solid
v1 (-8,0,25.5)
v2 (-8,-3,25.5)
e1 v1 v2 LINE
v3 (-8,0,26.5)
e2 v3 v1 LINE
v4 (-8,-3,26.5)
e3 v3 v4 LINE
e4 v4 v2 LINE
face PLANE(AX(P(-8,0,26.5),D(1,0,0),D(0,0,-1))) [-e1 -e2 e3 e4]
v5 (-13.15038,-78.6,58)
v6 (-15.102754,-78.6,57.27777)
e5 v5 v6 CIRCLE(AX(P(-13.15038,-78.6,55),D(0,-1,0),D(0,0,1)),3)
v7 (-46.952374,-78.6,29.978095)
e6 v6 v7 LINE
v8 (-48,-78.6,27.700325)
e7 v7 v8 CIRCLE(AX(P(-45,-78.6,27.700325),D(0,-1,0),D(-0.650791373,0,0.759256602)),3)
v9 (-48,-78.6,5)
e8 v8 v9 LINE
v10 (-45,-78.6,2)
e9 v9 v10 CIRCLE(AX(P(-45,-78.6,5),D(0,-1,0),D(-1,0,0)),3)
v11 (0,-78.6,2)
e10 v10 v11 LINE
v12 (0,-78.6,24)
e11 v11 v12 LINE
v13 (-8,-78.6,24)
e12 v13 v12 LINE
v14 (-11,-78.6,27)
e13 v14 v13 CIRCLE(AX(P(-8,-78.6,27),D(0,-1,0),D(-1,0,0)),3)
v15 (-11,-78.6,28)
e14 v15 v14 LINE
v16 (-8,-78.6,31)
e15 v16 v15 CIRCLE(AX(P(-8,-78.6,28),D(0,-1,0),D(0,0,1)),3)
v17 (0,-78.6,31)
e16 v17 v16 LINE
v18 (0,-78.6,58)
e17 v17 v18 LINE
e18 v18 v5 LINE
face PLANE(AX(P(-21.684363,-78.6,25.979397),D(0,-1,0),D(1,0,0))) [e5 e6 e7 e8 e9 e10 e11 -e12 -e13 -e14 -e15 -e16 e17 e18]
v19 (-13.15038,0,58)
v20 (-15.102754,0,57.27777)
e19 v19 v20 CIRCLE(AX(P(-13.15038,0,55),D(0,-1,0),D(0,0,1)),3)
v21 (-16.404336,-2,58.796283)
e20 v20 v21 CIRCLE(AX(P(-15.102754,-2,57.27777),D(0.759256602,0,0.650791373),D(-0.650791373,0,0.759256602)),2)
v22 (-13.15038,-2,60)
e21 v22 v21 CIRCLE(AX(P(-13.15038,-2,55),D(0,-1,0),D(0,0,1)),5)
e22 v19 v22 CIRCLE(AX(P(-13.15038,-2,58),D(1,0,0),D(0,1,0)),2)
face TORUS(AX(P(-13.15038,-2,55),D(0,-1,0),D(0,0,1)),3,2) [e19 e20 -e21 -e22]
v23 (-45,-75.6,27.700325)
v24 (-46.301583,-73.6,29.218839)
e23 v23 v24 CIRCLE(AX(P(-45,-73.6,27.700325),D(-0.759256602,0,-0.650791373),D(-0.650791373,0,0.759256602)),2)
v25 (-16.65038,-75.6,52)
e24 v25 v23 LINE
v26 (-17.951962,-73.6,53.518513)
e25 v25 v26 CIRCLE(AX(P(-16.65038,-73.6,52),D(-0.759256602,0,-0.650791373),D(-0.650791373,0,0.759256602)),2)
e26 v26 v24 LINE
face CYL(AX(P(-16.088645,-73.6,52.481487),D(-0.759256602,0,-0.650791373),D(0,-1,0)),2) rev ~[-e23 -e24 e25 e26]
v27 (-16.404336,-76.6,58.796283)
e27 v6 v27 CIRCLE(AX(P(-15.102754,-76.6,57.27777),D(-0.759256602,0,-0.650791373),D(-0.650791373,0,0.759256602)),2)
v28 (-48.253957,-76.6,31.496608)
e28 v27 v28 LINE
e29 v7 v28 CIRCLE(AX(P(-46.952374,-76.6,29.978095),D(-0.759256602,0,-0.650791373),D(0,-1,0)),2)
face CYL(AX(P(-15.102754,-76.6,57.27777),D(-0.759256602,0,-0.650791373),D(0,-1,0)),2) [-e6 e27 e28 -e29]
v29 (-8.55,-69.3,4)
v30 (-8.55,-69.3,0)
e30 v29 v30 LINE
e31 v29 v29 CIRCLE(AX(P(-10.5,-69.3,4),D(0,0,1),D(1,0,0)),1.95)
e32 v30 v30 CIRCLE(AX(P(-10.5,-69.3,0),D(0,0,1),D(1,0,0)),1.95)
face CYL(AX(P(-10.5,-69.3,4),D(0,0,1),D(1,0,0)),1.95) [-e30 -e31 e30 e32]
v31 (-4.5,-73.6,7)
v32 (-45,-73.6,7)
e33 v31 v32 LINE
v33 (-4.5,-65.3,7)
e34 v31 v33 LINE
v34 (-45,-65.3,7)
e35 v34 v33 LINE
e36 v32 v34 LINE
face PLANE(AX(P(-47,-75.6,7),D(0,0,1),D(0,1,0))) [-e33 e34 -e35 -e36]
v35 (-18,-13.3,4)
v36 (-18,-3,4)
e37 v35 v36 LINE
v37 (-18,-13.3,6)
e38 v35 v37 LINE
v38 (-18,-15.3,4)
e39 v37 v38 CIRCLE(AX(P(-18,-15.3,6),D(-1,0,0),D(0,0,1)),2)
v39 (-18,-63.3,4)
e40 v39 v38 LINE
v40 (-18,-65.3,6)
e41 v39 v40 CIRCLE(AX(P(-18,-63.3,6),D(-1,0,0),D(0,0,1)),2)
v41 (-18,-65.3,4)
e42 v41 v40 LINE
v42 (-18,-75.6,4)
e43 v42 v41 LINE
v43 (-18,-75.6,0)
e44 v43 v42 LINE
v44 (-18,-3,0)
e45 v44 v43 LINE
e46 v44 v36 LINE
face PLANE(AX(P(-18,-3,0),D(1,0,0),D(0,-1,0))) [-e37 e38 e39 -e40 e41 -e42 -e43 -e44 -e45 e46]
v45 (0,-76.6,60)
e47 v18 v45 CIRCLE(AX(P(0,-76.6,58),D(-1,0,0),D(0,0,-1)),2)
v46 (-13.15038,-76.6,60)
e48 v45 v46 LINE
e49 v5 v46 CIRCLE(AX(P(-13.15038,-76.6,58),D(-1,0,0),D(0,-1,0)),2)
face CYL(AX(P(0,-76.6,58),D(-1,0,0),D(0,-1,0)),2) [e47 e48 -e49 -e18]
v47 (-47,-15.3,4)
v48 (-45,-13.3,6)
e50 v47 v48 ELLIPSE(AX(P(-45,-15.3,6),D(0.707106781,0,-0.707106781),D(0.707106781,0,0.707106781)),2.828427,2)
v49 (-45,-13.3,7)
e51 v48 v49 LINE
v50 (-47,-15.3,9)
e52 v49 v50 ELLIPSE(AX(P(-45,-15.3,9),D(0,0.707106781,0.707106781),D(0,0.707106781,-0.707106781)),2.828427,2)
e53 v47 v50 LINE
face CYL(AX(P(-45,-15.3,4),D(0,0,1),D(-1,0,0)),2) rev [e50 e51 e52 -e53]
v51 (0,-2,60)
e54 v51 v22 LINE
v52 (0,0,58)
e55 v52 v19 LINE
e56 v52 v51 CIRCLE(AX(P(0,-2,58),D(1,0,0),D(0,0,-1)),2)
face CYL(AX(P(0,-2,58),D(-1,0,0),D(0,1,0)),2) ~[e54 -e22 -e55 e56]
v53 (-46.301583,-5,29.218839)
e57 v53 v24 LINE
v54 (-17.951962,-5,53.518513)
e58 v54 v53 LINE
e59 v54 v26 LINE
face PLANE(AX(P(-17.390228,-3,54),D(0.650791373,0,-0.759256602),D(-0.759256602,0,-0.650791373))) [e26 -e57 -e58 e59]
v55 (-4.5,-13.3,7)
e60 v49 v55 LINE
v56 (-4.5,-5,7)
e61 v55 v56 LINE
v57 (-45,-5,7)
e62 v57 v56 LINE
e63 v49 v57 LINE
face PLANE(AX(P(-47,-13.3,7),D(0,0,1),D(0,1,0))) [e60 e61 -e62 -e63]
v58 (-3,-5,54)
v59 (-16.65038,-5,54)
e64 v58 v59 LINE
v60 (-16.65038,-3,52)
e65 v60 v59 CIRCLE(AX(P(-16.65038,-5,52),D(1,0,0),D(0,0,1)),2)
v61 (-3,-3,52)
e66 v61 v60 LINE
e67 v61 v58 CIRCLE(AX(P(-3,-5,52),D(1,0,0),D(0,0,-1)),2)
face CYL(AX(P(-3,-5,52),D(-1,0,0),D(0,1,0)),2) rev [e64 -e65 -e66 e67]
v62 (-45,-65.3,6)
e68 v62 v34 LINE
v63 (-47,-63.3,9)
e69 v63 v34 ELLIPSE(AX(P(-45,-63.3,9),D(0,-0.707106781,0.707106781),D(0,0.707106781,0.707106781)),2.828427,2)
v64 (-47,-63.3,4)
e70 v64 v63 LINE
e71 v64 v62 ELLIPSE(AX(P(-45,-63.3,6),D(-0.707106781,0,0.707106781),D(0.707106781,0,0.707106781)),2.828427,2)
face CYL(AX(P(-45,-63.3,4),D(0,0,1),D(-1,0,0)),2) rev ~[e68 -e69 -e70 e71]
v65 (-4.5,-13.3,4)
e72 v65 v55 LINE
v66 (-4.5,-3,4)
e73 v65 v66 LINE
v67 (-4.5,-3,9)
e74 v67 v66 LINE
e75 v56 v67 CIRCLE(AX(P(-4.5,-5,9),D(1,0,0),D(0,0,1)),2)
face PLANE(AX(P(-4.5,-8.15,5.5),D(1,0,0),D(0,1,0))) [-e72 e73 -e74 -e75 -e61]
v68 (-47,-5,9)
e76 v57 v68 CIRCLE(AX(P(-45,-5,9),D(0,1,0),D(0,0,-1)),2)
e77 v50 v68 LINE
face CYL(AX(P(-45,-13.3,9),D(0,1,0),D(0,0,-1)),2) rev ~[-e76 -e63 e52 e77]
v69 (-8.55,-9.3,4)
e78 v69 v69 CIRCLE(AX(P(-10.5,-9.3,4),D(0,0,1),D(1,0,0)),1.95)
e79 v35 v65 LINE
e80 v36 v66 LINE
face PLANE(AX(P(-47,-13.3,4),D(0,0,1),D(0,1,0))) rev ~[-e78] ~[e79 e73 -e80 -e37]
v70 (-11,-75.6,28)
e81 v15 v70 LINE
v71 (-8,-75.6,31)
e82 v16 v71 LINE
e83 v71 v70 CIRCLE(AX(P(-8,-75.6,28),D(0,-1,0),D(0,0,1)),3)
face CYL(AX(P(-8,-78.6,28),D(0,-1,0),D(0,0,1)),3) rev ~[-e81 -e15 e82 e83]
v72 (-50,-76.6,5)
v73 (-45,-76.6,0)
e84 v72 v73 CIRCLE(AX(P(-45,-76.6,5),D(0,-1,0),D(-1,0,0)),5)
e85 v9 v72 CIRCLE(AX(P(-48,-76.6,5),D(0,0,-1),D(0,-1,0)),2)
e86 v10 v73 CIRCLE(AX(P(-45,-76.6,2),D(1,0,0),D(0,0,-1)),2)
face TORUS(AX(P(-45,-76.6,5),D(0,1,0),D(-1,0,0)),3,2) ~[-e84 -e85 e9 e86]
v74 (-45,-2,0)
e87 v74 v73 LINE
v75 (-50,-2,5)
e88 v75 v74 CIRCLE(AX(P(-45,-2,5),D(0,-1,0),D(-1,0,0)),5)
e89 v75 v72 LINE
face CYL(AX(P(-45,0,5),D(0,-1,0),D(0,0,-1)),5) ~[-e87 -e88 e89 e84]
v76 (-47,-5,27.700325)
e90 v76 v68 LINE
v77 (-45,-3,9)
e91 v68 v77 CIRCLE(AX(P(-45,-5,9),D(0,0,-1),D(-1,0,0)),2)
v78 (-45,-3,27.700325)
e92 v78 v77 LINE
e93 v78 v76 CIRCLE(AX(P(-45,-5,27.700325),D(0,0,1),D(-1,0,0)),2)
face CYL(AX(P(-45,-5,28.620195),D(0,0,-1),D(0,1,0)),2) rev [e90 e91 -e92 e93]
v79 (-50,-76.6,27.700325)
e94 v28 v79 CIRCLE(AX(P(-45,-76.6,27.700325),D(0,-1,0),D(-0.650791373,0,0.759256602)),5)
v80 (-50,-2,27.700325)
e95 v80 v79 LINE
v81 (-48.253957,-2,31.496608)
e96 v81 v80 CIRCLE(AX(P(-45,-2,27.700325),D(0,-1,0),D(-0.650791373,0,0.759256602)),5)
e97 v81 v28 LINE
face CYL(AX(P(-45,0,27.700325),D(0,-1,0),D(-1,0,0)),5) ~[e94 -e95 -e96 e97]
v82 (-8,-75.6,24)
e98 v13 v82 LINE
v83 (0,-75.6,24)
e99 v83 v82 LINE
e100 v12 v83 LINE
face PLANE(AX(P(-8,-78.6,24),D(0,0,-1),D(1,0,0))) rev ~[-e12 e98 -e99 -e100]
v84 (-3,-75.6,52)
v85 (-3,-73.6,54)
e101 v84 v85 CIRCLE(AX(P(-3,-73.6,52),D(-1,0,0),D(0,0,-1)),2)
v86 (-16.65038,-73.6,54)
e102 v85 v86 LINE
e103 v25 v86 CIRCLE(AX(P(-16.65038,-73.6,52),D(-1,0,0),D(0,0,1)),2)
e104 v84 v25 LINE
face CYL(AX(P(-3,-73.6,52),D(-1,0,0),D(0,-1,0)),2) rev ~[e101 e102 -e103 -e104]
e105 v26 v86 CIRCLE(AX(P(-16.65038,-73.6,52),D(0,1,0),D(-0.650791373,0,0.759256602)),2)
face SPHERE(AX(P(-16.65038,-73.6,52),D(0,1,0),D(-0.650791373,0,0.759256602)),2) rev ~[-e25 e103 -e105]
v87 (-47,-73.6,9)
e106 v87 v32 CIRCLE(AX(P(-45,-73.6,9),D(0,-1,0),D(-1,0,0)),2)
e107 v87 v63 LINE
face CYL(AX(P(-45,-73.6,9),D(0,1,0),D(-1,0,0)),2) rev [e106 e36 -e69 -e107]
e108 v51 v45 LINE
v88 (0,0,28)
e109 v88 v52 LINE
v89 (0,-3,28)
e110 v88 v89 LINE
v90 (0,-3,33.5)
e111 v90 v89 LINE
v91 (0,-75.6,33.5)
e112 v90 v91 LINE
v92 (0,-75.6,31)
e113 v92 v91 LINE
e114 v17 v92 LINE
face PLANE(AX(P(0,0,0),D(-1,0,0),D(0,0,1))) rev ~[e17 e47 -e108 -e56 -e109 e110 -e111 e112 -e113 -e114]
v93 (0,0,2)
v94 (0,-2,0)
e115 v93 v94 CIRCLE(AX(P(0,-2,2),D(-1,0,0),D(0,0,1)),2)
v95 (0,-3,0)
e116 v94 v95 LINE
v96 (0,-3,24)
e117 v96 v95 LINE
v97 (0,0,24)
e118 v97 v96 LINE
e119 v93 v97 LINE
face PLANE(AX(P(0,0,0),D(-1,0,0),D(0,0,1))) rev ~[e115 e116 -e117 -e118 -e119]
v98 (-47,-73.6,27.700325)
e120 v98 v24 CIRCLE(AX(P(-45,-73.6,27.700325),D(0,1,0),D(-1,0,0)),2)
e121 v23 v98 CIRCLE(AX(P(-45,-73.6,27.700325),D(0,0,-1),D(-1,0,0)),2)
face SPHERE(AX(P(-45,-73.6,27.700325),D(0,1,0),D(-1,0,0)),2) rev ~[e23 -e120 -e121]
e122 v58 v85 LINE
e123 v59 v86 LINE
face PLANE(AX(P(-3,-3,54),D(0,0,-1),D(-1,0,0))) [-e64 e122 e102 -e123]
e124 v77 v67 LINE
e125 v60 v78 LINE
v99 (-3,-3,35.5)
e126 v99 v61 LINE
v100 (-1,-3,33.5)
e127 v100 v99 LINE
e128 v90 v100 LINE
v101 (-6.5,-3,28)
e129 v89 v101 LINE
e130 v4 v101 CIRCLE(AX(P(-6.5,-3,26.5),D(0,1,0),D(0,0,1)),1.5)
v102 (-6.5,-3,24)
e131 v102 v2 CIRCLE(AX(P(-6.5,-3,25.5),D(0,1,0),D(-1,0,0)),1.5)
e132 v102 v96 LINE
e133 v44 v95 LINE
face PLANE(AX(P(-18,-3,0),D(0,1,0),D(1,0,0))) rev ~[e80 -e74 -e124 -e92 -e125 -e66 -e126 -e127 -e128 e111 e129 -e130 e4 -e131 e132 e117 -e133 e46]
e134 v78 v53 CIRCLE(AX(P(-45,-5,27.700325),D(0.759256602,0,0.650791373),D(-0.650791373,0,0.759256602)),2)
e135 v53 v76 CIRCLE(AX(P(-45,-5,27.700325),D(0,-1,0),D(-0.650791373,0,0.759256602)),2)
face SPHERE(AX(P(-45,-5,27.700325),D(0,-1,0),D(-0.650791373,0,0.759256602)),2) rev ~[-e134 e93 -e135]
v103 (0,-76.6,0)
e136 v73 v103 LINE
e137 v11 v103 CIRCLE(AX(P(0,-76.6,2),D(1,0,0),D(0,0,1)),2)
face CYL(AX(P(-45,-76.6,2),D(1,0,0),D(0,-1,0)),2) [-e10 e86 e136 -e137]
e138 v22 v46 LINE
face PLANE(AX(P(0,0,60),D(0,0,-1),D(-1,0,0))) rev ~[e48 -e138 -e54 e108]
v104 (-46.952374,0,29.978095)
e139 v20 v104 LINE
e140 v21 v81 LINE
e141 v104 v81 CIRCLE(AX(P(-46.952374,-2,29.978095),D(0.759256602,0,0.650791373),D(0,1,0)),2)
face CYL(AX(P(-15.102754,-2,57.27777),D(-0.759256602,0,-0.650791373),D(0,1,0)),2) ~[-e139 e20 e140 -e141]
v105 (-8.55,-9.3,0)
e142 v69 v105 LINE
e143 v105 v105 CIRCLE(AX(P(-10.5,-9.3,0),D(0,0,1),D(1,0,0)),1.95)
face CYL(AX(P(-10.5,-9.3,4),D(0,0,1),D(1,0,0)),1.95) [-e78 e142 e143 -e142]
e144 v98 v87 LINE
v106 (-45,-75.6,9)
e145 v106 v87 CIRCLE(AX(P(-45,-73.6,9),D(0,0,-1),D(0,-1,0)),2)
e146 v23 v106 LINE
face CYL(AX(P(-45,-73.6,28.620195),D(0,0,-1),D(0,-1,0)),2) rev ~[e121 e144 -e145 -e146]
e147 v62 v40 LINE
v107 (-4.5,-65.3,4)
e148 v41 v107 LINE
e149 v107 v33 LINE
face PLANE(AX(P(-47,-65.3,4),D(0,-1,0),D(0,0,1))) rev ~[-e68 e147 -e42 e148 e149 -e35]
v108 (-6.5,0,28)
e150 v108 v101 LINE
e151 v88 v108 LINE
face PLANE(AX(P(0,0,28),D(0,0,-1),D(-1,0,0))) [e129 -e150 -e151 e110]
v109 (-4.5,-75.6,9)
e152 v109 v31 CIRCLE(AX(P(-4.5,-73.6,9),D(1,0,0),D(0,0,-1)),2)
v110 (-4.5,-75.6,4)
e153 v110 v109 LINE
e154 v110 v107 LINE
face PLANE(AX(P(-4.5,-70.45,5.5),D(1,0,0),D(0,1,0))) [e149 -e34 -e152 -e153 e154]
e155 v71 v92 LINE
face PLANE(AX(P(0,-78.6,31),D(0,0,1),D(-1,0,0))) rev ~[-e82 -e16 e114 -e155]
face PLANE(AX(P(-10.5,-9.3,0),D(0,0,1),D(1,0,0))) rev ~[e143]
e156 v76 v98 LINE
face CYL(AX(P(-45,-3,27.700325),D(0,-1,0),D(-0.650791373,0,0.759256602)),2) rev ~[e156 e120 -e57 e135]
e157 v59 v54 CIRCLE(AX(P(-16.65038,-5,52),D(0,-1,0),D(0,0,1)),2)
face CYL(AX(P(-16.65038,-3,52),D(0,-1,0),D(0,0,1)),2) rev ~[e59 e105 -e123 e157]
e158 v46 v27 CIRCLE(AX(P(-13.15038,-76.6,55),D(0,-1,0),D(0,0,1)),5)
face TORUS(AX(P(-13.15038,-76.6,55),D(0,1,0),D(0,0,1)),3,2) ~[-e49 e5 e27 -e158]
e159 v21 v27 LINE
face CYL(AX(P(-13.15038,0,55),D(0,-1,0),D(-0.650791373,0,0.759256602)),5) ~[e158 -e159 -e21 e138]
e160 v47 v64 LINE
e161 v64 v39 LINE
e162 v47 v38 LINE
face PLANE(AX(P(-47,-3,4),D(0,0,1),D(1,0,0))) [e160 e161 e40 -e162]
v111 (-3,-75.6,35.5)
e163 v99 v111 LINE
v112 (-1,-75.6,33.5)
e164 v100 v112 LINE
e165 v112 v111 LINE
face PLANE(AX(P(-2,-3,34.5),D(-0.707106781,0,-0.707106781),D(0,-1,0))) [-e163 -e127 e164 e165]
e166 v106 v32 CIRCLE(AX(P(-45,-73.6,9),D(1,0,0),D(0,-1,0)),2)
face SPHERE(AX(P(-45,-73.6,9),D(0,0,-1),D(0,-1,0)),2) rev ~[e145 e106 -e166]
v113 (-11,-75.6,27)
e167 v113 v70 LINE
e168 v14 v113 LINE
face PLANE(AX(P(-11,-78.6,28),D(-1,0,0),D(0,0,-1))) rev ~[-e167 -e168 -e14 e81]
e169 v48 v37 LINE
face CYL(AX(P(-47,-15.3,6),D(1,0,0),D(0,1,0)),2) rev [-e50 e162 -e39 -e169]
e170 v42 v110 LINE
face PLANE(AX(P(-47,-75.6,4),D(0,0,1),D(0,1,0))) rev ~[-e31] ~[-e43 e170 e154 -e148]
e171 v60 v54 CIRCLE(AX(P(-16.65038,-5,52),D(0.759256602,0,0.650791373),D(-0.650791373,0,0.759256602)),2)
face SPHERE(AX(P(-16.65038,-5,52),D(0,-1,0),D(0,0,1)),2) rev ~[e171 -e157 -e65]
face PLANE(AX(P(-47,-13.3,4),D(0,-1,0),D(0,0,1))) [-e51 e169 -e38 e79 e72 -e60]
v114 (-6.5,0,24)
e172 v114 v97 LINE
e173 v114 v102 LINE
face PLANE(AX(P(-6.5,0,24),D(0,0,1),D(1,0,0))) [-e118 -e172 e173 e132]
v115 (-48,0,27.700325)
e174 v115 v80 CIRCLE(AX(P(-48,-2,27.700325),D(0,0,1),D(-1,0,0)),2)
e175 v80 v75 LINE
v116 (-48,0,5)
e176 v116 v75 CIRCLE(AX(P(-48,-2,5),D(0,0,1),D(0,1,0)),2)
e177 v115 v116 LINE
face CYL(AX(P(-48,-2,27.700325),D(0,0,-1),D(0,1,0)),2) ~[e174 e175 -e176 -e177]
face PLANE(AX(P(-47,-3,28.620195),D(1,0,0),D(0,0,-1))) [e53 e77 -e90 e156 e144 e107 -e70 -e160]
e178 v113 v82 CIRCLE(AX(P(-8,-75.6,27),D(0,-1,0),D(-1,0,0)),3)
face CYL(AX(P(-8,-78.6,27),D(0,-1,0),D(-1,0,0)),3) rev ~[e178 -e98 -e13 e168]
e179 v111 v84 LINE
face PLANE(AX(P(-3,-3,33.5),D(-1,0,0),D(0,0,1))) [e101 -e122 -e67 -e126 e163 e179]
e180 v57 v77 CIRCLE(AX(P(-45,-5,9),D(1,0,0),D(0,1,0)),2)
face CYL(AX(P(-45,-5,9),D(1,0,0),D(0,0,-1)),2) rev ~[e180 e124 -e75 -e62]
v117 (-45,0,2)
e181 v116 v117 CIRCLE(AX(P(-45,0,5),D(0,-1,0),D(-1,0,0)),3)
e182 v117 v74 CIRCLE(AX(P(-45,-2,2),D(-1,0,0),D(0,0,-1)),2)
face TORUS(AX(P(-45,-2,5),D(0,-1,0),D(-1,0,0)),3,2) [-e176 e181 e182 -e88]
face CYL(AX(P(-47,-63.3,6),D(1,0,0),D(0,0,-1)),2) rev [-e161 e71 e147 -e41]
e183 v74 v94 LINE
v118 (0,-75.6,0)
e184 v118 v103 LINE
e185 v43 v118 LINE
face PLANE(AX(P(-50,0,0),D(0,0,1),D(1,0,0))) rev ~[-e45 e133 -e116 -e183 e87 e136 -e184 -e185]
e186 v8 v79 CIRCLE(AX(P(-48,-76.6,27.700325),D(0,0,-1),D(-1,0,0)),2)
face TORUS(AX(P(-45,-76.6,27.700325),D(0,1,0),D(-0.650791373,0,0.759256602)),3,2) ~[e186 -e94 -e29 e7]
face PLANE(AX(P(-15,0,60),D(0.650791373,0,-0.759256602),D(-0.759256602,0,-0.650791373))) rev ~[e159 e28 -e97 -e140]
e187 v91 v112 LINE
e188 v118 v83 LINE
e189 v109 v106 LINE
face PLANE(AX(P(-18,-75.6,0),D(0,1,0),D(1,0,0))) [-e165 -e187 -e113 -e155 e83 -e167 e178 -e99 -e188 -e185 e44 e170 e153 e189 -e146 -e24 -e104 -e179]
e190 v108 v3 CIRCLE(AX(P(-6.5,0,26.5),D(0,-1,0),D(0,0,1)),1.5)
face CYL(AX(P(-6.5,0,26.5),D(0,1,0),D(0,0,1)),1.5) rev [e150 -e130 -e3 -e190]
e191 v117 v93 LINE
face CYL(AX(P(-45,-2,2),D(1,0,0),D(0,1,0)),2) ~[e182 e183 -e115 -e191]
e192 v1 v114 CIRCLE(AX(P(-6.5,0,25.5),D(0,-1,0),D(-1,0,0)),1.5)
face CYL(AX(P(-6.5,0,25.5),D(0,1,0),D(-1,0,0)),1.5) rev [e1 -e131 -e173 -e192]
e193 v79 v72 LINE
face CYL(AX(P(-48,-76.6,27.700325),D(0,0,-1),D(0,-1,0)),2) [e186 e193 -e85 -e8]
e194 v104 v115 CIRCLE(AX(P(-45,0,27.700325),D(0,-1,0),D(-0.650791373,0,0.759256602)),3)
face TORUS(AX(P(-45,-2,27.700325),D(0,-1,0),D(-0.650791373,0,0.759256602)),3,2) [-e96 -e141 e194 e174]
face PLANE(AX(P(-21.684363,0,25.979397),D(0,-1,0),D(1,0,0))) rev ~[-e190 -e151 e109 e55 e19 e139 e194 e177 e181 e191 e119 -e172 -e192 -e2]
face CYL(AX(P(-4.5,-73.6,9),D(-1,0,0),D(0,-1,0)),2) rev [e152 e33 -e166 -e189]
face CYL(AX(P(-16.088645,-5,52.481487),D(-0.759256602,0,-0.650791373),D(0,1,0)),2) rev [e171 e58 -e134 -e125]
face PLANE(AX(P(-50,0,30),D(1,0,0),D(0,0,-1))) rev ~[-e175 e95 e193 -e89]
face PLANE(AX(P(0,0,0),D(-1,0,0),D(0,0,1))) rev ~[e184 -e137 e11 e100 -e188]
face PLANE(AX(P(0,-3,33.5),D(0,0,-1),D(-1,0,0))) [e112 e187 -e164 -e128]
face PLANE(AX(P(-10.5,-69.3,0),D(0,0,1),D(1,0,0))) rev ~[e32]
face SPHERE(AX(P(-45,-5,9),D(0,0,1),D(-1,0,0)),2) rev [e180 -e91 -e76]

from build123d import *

# Parameters (mm, degrees)
F1_DEPTH  = 78.6
F4_DEPTH  = 72.6
F5_W      = 18
F5_H      = 72.6
F6_DEPTH  = 5
F8_DEPTH  = 5
F10_DEPTH = 5
F11_R     = 5
F12_R     = 2
F13_W     = 10.3
F13_H     = 3
F14_DEPTH = 42.5
F16_R     = 1.95
F17_DEPTH = 4
F18_SIZE  = 2
F19_R     = 2


with BuildPart() as f1:
    # F0 (on Front) → F1 (new body)
    with BuildSketch(Plane.XZ):
        Polygon((-50, 0), (0, 0), (0, 60), (-15, 60), (-50, 30), align=None)
    extrude(amount=F1_DEPTH)

    # F3 (on offset) → F4 (cut)
    with BuildSketch(Plane.XZ.offset(3)):
        Polygon((-47, 4), (0, 4), (0, 33.5), (-3, 33.5), (-3, 54), (-17.3902277714, 54), (-47, 28.6201952326), align=None)
    extrude(amount=F4_DEPTH, mode=Mode.SUBTRACT)

    # F5 (on face) → F6 (cut)
    with BuildSketch(Plane(origin=(0, 0, 0), x_dir=(1, 0, 0), z_dir=(0, 0, -1))):
        with Locations((-9, 39.3)):
            Rectangle(F5_W, F5_H)
    extrude(amount=-F6_DEPTH, mode=Mode.SUBTRACT)

    # F7 (on Front) → F8 (cut)
    with BuildSketch(Plane.XZ):
        with BuildLine():
            Line((-6.5, 24), (0, 24))
            Line((0, 24), (0, 28))
            Line((0, 28), (-6.5, 28))
            ThreePointArc((-6.5, 28), (-7.5606601718, 27.5606601718), (-8, 26.5))
            Line((-8, 26.5), (-8, 25.5))
            ThreePointArc((-8, 25.5), (-7.5606601718, 24.4393398282), (-6.5, 24))
        make_face()
    extrude(amount=F8_DEPTH, mode=Mode.SUBTRACT)

    # F9 (on face) → F10 (cut)
    with BuildSketch(Plane.XZ.offset(78.6)):
        with BuildLine():
            Line((-8, 24), (0, 24))
            Line((0, 24), (0, 31))
            Line((0, 31), (-8, 31))
            ThreePointArc((-8, 31), (-10.1213203436, 30.1213203436), (-11, 28))
            Line((-11, 28), (-11, 27))
            ThreePointArc((-11, 27), (-10.1213203436, 24.8786796564), (-8, 24))
        make_face()
    extrude(amount=-F10_DEPTH, mode=Mode.SUBTRACT)

    # F11
    f11_edges = [f1.edges().sort_by_distance(p)[0] for p in [
        (-15, -39.3, 60),
        (-50, -39.3, 30),
        (-50, -39.3, 0),
    ]]
    fillet(f11_edges, radius=F11_R)

    # F12
    f12_edges = [f1.edges().sort_by_distance(p)[0] for p in [
        (-32.329147, 0, 45.146446),
        (-32.329147, -78.6, 45.146446),
        (-22.5, 0, 0),
        (-22.5, -78.6, 0),
        (-50, 0, 16.350163),
        (-49.542564, 0, 29.789609),
        (-48.535534, 0, 1.464466),
        (-14.885111, 0, 59.689425),
        (-6.57519, 0, 60),
        (-48.535534, -78.6, 1.464466),
        (-50, -78.6, 16.350163),
        (-49.542564, -78.6, 29.789609),
        (-14.885111, -78.6, 59.689425),
        (-6.57519, -78.6, 60),
        (-10.195114, -3, 54),
        (-32.195114, -3, 41.310098),
        (-47, -3, 16.310098),
        (-47, -75.6, 16.310098),
        (-32.195114, -75.6, 41.310098),
        (-10.195114, -75.6, 54),
        (-17.390228, -39.3, 54),
        (-47, -39.3, 28.620195),
    ]]
    fillet(f12_edges, radius=F12_R)

    # F13 (on face) → F14 (join)
    with BuildSketch(Plane.YZ.offset(-47)):
        with Locations((-8.15, 5.5)):
            Rectangle(F13_W, F13_H)
        with Locations((-70.45, 5.5)):
            Rectangle(F13_W, F13_H)
    extrude(amount=F14_DEPTH)

    # F16 (on offset) → F17 (join)
    with BuildSketch(Plane.XY.offset(4)):
        with Locations((-10.5, -9.3)):
            Circle(F16_R)
        with Locations((-10.5, -69.3)):
            Circle(F16_R)
    extrude(amount=-F17_DEPTH)

    # F18
    f18_edges = [f1.edges().sort_by_distance(p)[0] for p in [
        (-3, -39.3, 33.5),
    ]]
    chamfer(f18_edges, length=F18_SIZE)

    # F19
    f19_edges = [f1.edges().sort_by_distance(p)[0] for p in [
        (-47, -9.15, 7),
        (-47, -13.3, 5.5),
        (-47, -69.45, 7),
        (-47, -65.3, 5.5),
        (-24.75, -75.6, 7),
        (-24.75, -3, 7),
        (-46.414214, -3.585786, 7),
        (-32.5, -13.3, 4),
        (-32.5, -65.3, 4),
        (-46.414214, -75.014214, 7),
    ]]
    fillet(f19_edges, radius=F19_R)


solid = f1.part
